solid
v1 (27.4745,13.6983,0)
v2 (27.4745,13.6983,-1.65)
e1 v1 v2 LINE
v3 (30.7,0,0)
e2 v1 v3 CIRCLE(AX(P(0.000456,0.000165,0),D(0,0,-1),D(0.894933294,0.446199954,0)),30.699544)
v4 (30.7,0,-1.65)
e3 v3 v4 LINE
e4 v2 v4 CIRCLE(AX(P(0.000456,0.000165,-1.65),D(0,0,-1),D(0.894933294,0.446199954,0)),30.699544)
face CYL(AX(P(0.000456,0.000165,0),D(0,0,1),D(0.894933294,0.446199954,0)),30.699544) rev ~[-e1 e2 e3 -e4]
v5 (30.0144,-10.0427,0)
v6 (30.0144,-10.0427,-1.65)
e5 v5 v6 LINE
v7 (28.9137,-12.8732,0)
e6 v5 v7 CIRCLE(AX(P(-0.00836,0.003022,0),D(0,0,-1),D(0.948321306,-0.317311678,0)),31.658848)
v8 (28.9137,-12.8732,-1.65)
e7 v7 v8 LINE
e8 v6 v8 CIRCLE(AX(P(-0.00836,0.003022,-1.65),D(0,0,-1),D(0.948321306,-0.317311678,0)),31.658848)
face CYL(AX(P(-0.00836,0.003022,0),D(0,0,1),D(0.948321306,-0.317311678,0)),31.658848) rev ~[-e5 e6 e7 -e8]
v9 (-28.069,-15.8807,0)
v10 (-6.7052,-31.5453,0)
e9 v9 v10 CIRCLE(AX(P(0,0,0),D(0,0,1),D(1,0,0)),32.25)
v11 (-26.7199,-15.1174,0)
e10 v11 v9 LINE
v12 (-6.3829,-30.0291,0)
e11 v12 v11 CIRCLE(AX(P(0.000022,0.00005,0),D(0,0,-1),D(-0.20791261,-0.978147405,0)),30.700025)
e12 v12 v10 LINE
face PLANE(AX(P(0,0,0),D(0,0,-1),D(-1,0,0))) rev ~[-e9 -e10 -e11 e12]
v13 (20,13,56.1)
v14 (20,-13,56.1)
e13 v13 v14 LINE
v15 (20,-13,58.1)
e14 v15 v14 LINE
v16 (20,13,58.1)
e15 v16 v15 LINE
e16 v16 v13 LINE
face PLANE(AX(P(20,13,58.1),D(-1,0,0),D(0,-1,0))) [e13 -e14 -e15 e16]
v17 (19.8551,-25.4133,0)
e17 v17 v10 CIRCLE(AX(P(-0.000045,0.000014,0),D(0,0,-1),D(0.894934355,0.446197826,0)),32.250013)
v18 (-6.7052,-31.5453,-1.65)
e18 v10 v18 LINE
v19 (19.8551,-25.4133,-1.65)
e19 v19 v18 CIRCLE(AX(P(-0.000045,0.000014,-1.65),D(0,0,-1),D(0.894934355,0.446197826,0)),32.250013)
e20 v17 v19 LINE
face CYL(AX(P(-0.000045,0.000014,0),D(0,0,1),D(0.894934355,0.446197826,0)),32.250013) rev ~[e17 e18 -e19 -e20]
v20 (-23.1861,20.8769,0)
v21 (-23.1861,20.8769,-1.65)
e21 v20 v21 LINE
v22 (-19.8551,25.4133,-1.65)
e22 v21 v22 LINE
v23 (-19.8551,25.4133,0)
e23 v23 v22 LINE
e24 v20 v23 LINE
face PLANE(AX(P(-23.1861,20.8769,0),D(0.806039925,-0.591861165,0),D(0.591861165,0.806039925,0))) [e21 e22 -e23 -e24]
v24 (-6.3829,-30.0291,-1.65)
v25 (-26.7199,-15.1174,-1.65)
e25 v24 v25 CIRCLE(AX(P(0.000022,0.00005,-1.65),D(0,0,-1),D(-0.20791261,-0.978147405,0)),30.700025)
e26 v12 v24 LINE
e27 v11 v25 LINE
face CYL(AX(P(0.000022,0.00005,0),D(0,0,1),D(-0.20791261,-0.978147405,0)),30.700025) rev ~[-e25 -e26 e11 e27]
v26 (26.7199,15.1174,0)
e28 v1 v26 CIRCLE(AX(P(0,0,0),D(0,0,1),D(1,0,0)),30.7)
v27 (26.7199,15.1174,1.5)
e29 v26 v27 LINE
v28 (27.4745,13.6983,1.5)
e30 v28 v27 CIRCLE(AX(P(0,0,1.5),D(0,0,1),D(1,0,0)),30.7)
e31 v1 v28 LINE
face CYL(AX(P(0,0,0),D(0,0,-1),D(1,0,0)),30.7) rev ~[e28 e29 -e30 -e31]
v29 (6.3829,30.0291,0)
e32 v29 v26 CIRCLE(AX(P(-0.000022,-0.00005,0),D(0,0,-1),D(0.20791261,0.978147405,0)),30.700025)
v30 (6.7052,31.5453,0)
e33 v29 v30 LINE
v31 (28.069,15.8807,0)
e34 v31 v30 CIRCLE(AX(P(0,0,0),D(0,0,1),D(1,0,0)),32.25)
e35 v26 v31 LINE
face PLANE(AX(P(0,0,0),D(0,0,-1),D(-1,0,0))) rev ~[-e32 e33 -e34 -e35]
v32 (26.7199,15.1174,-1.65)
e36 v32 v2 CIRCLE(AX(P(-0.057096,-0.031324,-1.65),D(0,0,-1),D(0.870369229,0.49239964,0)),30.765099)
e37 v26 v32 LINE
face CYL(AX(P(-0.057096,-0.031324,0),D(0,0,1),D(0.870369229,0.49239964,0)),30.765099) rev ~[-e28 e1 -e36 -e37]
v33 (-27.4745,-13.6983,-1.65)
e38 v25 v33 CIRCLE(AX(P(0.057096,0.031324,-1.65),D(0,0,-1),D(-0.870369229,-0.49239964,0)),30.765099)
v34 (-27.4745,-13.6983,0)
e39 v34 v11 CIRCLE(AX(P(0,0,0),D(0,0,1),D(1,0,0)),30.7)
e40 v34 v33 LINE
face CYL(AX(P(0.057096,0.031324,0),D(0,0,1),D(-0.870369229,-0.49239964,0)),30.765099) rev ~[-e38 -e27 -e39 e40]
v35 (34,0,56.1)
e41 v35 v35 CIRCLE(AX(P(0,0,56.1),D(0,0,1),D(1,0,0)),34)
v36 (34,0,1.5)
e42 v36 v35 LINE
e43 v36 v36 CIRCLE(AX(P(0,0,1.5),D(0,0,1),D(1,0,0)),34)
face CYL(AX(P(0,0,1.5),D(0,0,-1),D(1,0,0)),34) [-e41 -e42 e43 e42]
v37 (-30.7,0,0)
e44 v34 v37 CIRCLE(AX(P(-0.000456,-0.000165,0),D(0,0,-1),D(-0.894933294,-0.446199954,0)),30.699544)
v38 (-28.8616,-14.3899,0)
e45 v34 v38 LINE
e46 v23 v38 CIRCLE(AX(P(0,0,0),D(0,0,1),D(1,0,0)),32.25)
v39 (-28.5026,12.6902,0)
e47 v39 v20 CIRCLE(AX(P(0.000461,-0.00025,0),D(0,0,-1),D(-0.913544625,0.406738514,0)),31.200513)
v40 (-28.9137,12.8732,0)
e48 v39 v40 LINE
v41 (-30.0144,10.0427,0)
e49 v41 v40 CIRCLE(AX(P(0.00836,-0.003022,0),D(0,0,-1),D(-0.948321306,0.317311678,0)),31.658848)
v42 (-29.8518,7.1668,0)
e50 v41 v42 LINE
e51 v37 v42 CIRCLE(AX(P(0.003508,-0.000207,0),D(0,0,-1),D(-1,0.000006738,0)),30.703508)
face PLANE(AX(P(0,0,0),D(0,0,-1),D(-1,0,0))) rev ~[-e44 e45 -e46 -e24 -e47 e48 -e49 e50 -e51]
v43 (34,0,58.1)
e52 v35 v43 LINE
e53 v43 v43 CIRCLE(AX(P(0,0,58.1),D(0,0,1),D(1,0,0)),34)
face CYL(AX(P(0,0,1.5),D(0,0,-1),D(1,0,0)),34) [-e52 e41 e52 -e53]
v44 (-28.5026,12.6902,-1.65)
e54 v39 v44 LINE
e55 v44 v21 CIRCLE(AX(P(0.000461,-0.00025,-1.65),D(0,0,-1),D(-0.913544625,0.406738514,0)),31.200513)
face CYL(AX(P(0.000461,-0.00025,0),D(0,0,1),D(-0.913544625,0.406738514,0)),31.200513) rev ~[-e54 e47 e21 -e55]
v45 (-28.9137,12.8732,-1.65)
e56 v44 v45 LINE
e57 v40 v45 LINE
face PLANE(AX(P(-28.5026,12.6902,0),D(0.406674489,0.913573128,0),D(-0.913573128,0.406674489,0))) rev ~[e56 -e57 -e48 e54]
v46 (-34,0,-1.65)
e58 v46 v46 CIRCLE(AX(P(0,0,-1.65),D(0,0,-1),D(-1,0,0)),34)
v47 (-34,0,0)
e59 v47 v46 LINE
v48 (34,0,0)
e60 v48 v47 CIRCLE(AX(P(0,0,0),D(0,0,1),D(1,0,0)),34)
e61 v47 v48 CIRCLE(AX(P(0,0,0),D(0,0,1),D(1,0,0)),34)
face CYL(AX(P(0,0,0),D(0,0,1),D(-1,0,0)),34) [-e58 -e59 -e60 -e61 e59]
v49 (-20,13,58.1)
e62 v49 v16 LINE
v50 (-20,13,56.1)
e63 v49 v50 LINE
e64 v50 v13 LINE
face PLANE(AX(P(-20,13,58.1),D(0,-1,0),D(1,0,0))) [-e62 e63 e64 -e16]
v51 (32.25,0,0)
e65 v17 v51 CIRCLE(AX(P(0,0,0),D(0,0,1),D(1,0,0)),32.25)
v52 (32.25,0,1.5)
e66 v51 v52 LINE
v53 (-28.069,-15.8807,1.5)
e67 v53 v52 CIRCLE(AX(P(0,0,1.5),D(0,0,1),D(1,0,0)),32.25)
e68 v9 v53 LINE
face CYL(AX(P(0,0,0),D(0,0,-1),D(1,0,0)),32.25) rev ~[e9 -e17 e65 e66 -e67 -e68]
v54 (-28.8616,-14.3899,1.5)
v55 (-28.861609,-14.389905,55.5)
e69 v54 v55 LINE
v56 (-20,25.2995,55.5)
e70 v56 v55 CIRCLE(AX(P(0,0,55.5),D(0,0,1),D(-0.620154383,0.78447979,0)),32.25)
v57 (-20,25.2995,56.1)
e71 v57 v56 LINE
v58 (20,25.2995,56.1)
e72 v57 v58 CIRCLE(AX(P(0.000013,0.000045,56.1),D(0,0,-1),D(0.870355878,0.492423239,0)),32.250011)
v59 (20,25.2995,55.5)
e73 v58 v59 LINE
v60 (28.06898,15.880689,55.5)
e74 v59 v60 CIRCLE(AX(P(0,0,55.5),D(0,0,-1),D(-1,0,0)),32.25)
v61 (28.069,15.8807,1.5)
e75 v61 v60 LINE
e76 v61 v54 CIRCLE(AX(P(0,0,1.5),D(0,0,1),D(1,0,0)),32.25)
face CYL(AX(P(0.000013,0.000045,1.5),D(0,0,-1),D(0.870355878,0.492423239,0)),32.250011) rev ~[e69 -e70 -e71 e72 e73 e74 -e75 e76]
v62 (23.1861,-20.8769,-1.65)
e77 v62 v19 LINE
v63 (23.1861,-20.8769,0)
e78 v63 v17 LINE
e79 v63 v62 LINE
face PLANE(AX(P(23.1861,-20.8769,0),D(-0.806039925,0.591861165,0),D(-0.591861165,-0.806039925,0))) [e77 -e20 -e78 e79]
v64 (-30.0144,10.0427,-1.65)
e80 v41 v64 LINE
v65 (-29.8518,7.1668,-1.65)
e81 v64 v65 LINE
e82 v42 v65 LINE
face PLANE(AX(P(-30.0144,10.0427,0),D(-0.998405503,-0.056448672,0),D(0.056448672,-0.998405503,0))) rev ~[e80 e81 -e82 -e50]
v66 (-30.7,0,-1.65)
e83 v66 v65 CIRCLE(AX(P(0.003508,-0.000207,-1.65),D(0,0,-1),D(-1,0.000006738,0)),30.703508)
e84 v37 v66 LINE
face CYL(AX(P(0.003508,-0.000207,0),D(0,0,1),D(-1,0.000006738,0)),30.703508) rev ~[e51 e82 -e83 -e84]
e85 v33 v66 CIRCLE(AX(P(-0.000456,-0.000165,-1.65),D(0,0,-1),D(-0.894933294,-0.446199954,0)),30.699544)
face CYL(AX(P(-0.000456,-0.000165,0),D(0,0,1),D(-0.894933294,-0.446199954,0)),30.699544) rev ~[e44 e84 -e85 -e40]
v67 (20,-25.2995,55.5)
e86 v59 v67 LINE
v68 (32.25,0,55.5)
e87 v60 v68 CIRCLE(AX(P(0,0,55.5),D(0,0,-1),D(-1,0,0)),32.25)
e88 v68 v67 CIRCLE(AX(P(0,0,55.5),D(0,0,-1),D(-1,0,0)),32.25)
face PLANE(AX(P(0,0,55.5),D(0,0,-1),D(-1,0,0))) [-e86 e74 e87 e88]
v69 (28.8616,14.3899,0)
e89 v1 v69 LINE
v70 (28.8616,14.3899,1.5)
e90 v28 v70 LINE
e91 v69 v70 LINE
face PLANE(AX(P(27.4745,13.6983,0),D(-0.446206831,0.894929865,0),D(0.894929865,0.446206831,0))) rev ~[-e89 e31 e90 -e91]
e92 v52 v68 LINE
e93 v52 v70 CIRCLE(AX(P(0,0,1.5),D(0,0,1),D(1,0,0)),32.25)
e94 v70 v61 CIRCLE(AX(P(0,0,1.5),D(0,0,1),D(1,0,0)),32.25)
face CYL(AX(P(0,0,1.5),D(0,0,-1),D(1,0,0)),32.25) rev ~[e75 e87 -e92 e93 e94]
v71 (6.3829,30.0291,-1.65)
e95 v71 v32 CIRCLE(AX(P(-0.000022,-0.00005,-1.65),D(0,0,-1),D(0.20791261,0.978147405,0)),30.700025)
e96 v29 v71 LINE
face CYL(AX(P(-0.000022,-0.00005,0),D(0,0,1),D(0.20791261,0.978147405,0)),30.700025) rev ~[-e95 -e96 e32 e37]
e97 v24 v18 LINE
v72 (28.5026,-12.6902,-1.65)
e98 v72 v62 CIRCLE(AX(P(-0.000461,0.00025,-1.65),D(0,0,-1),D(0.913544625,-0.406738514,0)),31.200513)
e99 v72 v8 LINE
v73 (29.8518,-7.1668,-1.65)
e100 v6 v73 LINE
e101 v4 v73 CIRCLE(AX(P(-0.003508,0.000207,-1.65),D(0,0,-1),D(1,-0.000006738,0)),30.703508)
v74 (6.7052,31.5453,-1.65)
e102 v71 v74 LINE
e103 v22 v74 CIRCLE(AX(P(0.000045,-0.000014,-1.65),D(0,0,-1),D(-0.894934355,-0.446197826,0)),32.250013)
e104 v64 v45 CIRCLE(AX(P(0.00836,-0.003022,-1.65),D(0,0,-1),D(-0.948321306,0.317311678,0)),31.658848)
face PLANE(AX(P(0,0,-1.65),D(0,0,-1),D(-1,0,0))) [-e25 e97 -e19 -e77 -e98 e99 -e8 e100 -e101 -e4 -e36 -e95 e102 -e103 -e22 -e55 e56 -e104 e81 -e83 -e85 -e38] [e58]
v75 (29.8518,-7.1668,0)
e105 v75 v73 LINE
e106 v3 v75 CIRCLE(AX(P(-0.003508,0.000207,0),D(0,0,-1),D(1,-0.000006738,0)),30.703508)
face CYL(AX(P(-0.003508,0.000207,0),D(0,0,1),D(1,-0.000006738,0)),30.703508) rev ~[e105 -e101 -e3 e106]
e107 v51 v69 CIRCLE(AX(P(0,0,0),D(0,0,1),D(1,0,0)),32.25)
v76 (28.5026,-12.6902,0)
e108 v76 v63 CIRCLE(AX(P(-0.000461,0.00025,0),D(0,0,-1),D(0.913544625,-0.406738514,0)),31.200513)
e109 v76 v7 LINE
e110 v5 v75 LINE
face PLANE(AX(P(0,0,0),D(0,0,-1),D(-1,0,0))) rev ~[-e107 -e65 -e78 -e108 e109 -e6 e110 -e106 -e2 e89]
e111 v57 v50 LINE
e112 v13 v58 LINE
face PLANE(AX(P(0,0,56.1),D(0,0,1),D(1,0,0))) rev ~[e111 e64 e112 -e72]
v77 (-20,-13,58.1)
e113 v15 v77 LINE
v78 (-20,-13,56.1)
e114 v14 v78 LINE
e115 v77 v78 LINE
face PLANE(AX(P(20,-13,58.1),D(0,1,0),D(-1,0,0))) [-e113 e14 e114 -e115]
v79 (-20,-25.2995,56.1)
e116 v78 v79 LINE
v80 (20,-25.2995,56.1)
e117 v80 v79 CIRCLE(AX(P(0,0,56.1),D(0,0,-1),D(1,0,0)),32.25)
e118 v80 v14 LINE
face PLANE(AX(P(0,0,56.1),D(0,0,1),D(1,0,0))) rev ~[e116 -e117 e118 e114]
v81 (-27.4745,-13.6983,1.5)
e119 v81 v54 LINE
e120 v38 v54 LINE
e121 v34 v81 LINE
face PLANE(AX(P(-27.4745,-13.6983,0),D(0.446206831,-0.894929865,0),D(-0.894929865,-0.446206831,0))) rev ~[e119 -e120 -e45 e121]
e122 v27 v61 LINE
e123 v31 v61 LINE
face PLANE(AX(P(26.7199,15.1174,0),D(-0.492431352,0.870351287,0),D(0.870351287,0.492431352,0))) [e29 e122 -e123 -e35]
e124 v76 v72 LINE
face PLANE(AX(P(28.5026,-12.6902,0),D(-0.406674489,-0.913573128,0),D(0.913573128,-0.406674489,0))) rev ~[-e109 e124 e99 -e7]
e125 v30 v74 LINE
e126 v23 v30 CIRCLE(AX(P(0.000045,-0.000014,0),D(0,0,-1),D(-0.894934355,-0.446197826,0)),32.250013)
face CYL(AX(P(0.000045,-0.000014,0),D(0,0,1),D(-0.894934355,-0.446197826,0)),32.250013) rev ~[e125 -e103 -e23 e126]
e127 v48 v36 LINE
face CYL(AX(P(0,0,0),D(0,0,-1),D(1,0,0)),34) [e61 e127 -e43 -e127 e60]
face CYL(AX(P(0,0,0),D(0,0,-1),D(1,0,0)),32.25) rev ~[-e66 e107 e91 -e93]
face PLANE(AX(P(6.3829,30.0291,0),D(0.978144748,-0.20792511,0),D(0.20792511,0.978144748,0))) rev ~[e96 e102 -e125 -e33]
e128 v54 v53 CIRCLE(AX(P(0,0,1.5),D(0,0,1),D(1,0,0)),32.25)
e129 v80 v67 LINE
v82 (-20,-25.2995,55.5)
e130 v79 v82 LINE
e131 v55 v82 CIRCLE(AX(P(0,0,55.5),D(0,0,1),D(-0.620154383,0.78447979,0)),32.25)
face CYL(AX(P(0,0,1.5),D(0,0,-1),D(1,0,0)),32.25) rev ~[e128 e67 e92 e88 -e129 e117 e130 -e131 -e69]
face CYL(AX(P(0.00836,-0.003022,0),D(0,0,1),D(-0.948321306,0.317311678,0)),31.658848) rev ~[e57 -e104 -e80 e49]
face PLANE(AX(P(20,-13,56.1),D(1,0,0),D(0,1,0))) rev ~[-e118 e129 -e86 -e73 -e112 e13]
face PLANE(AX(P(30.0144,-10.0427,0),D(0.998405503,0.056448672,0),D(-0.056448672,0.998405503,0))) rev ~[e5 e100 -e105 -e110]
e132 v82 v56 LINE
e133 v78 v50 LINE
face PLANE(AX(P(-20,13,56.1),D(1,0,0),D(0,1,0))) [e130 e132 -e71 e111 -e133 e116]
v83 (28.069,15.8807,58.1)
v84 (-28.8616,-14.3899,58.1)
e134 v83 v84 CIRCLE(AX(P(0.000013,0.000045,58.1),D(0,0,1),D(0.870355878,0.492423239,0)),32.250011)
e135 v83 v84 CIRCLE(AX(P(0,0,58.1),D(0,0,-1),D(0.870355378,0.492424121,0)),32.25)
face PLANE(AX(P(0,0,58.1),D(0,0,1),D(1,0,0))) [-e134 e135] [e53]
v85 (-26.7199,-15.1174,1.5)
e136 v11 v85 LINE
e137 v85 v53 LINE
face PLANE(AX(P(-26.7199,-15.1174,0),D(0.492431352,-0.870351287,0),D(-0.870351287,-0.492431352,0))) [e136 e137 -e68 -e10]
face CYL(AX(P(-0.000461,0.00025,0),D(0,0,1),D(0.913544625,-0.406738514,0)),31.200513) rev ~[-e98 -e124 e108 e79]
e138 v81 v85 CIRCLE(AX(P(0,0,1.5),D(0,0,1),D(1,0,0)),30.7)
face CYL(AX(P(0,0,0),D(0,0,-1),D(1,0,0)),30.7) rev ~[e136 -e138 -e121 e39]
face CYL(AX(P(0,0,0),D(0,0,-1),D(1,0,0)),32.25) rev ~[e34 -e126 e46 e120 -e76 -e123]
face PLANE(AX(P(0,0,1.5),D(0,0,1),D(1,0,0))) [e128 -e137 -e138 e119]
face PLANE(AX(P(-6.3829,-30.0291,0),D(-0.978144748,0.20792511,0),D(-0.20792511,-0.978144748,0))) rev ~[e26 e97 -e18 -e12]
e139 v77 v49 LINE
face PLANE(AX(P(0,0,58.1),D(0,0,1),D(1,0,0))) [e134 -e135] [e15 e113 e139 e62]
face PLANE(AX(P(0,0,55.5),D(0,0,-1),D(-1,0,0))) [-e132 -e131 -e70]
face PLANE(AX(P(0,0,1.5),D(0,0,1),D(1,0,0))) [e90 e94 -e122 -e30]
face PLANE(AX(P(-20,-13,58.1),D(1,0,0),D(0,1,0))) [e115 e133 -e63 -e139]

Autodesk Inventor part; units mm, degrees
ref_plane "YZ Plane" through (0, 0, 0) normal (1, 0, 0) x (0, 1, 0)
ref_plane "XZ Plane" through (0, 0, 0) normal (0, 1, 0) x (-1, 0, 0)
ref_plane "XY Plane" through (0, 0, 0) normal (0, 0, 1) x (1, 0, 0)
sketch "Sketch1" plane through (0, 0, 0) normal (0, 0, 1) x (1, 0, 0)
  circle A0 centre (0, 0) radius 32.25
  circle A1 centre (0, 0) radius 34
  line L0 (0, 0) -> (34, 0) construction
  line L1 (0, 0) -> (30.0202, 15.962) construction
  circle A2 centre (0, 0) radius 30.7
  line L2 (0, 0) -> (26.7199, 15.1174) construction
  line L3 (0, 0) -> (27.4745, 13.6983) construction
  line L4 (28.069, 15.8807) -> (29.5921, 16.7424) construction
  line L5 (28.8616, 14.3899) -> (30.4278, 15.1707) construction
  line L6 (27.4745, 13.6983) -> (28.8616, 14.3899)
  line L7 (26.7199, 15.1174) -> (28.069, 15.8807)
  line L8 (-26.7199, -15.1174) -> (-28.069, -15.8807)
  line L9 (-27.4745, -13.6983) -> (-28.8616, -14.3899)
  point P0 (-28.069, -15.8807)
  point P1 (-27.4745, -13.6983)
  dimension "d0" = 64.5
  dimension "d1" = 68
  dimension "d2" = 28
  dimension "d3" = 61.4
  dimension "d4" = 3
  dimension "d11" = 360
extrude "Extrusion1" add sketch "Sketch1" along normal blind 1.5 contours L6 A2 L7 A0 | A0 L9 A2 L8 | A1
sketch "Sketch2" plane through (0, 0, 0) normal (0, 0, -1) x (-1, 0, 0)
  line L0 (-27.4745, 13.6983) -> (-28.8616, 14.3899) projected
  arc A0 (-28.8616, 14.3899) -> (28.069, -15.8807) centre (0, 0) ccw projected
  line L1 (28.069, -15.8807) -> (26.7199, -15.1174) projected
  arc A1 (26.7199, -15.1174) -> (27.4745, -13.6983) centre (0, 0) ccw projected
  line L2 (27.4745, -13.6983) -> (28.8616, -14.3899) projected
  arc A2 (28.8616, -14.3899) -> (-28.069, 15.8807) centre (0, 0) ccw projected
  line L3 (-28.069, 15.8807) -> (-26.7199, 15.1174) projected
  arc A3 (-26.7199, 15.1174) -> (-27.4745, 13.6983) centre (0, 0) ccw projected
  circle A4 centre (0, 0) radius 34 projected
  line L4 (0, 0) -> (-34, 0) construction
  arc A5 (-30.7, 0) -> (-29.8518, -7.1668) centre (0, 0) ccw
  arc A6 (-28.9137, -12.8732) -> (-30.0144, -10.0427) centre (0, 0) ccw construction
  line L5 (0, 0) -> (-28.0458, -12.4868) construction
  line L6 (-28.0458, -12.4868) -> (-28.5026, -12.6902) construction
  line L7 (0, 0) -> (-30.0144, -10.0427) construction
  line L8 (0, 0) -> (-30.7755, -7.3885) construction
  line L9 (-30.0144, -10.0427) -> (-29.8518, -7.1668)
  arc A7 (-23.1861, -20.8769) -> (-28.5026, -12.6902) centre (0, 0) ccw construction
  line L10 (0, 0) -> (-23.9664, -21.5795) construction
  line L11 (-28.5026, -12.6902) -> (-28.9137, -12.8732)
  line L12 (0, 0) -> (-19.8551, -25.4133) construction
  line L13 (-23.1861, -20.8769) -> (-19.8551, -25.4133)
  arc A8 (-30.0144, -10.0427) -> (-28.9137, -12.8732) centre (0, 0) ccw
  arc A9 (-28.5026, -12.6902) -> (-23.1861, -20.8769) centre (0, 0) ccw
  arc A10 (-27.4745, 13.6983) -> (-30.7, 0) centre (0, 0) ccw
  arc A11 (-29.8518, -7.1668) -> (-26.7199, 15.1174) centre (0, 0) ccw construction
  arc A12 (-26.7199, 15.1174) -> (-27.4745, 13.6983) centre (0, 0) ccw
  arc A13 (26.7199, -15.1174) -> (27.4745, -13.6983) centre (0, 0) ccw
  arc A14 (27.4745, -13.6983) -> (30.7, 0) centre (0, 0) ccw
  arc A15 (30.7, 0) -> (29.8518, 7.1668) centre (0, 0) ccw
  line L14 (30.0144, 10.0427) -> (29.8518, 7.1668)
  arc A16 (30.0144, 10.0427) -> (28.9137, 12.8732) centre (0, 0) ccw
  line L15 (28.5026, 12.6902) -> (28.9137, 12.8732)
  arc A17 (28.5026, 12.6902) -> (23.1861, 20.8769) centre (0, 0) ccw
  line L16 (23.1861, 20.8769) -> (19.8551, 25.4133)
  line L17 (0, 0) -> (6.3829, -30.0291) construction
  arc A18 (-28.8616, 14.3899) -> (28.069, -15.8807) centre (0, 0) ccw projected
  arc A19 (6.3829, -30.0291) -> (26.7199, -15.1174) centre (0, 0) ccw
  line L18 (6.3829, -30.0291) -> (6.7052, -31.5453)
  line L19 (0, 0) -> (-6.3829, 30.0291) construction
  line L20 (-6.3829, 30.0291) -> (-6.7052, 31.5453)
  arc A20 (-6.3829, 30.0291) -> (-26.7199, 15.1174) centre (0, 0) ccw
  point P0 (28.0458, 12.4868)
  point P1 (27.4745, -13.6983)
  point P2 (-26.7199, 15.1174)
  dimension "d15" = 63.3
  dimension "d16" = 24
  dimension "d17" = 18.5
  dimension "d18" = 13.5
  dimension "d19" = 62.4
  dimension "d20" = 42
  dimension "d21" = 52
  dimension "d24" = 360
  dimension "d43" = 50
  dimension "d46" = 360
extrude "Extrusion2" add sketch "Sketch2" along normal blind 1.65 contours A10 A5 L9 A8 L11 A9 L13 A0 L0 | L3 A2 L20 A20 | L18 A19 L1 A0 | A2 L2 A14 A15 L14 A16 L15 A17 L16 | A4
sketch "Sketch4" plane through (0, 0, 1.5) normal (0, 0, 1) x (1, 0, 0)
  circle A0 centre (0, 0) radius 34 projected
  arc A1 (28.069, 15.8807) -> (-28.8616, -14.3899) centre (0, 0) ccw projected
  circle A2 centre (0, 0) radius 32.25
  point P0 (-28.8616, -14.3899)
extrude "Extrusion4" add sketch "Sketch4" along normal blind 56.6
sketch "Sketch5" plane through (0, 0, 58.1) normal (0, 0, 1) x (1, 0, 0)
  circle A0 centre (0, 0) radius 34 projected
  line L0 (-20, 13) -> (20, 13)
  line L1 (20, 13) -> (20, -13)
  line L2 (20, -13) -> (-20, -13)
  line L3 (-20, -13) -> (-20, 13)
  line L4 (-20, 13) -> (20, -13) construction
  line L5 (20, 13) -> (-20, -13) construction
  dimension "d37" = 40
  dimension "d38" = 26
extrude "Extrusion5" add sketch "Sketch5" against normal blind 2
sketch "Sketch6" plane through (0, 0, 56.1) normal (0, 0, -1) x (-1, 0, 0)
  line L0 (-20, 13) -> (20, 13) projected
  line L1 (20, 13) -> (20, -13) projected
  line L2 (20, -13) -> (-20, -13) projected
  line L3 (-20, -13) -> (-20, 13) projected
  circle A0 centre (0, 0) radius 32.25 projected
  line L4 (-20, -13) -> (20, -13) projected
  line L5 (20, -13) -> (20, -25.2995)
  line L6 (20, -13) -> (20, 13) construction
  line L7 (20, 0) -> (-20, 0) construction
  line L8 (-20, 13) -> (-20, -13) construction
  line L9 (0, -13) -> (0, 13) construction
  line L10 (20, 13) -> (-20, 13) construction
  line L11 (-20, -13) -> (-20, -25.2995)
  line L12 (20, 13) -> (20, 25.2995)
  line L13 (-20, 13) -> (-20, 25.2995)
extrude "Extrusion6" add sketch "Sketch6" along normal blind 0.6 contours L3 L11 A0 L13 | L12 A0 L5 L1
properties part number "LensMount"
